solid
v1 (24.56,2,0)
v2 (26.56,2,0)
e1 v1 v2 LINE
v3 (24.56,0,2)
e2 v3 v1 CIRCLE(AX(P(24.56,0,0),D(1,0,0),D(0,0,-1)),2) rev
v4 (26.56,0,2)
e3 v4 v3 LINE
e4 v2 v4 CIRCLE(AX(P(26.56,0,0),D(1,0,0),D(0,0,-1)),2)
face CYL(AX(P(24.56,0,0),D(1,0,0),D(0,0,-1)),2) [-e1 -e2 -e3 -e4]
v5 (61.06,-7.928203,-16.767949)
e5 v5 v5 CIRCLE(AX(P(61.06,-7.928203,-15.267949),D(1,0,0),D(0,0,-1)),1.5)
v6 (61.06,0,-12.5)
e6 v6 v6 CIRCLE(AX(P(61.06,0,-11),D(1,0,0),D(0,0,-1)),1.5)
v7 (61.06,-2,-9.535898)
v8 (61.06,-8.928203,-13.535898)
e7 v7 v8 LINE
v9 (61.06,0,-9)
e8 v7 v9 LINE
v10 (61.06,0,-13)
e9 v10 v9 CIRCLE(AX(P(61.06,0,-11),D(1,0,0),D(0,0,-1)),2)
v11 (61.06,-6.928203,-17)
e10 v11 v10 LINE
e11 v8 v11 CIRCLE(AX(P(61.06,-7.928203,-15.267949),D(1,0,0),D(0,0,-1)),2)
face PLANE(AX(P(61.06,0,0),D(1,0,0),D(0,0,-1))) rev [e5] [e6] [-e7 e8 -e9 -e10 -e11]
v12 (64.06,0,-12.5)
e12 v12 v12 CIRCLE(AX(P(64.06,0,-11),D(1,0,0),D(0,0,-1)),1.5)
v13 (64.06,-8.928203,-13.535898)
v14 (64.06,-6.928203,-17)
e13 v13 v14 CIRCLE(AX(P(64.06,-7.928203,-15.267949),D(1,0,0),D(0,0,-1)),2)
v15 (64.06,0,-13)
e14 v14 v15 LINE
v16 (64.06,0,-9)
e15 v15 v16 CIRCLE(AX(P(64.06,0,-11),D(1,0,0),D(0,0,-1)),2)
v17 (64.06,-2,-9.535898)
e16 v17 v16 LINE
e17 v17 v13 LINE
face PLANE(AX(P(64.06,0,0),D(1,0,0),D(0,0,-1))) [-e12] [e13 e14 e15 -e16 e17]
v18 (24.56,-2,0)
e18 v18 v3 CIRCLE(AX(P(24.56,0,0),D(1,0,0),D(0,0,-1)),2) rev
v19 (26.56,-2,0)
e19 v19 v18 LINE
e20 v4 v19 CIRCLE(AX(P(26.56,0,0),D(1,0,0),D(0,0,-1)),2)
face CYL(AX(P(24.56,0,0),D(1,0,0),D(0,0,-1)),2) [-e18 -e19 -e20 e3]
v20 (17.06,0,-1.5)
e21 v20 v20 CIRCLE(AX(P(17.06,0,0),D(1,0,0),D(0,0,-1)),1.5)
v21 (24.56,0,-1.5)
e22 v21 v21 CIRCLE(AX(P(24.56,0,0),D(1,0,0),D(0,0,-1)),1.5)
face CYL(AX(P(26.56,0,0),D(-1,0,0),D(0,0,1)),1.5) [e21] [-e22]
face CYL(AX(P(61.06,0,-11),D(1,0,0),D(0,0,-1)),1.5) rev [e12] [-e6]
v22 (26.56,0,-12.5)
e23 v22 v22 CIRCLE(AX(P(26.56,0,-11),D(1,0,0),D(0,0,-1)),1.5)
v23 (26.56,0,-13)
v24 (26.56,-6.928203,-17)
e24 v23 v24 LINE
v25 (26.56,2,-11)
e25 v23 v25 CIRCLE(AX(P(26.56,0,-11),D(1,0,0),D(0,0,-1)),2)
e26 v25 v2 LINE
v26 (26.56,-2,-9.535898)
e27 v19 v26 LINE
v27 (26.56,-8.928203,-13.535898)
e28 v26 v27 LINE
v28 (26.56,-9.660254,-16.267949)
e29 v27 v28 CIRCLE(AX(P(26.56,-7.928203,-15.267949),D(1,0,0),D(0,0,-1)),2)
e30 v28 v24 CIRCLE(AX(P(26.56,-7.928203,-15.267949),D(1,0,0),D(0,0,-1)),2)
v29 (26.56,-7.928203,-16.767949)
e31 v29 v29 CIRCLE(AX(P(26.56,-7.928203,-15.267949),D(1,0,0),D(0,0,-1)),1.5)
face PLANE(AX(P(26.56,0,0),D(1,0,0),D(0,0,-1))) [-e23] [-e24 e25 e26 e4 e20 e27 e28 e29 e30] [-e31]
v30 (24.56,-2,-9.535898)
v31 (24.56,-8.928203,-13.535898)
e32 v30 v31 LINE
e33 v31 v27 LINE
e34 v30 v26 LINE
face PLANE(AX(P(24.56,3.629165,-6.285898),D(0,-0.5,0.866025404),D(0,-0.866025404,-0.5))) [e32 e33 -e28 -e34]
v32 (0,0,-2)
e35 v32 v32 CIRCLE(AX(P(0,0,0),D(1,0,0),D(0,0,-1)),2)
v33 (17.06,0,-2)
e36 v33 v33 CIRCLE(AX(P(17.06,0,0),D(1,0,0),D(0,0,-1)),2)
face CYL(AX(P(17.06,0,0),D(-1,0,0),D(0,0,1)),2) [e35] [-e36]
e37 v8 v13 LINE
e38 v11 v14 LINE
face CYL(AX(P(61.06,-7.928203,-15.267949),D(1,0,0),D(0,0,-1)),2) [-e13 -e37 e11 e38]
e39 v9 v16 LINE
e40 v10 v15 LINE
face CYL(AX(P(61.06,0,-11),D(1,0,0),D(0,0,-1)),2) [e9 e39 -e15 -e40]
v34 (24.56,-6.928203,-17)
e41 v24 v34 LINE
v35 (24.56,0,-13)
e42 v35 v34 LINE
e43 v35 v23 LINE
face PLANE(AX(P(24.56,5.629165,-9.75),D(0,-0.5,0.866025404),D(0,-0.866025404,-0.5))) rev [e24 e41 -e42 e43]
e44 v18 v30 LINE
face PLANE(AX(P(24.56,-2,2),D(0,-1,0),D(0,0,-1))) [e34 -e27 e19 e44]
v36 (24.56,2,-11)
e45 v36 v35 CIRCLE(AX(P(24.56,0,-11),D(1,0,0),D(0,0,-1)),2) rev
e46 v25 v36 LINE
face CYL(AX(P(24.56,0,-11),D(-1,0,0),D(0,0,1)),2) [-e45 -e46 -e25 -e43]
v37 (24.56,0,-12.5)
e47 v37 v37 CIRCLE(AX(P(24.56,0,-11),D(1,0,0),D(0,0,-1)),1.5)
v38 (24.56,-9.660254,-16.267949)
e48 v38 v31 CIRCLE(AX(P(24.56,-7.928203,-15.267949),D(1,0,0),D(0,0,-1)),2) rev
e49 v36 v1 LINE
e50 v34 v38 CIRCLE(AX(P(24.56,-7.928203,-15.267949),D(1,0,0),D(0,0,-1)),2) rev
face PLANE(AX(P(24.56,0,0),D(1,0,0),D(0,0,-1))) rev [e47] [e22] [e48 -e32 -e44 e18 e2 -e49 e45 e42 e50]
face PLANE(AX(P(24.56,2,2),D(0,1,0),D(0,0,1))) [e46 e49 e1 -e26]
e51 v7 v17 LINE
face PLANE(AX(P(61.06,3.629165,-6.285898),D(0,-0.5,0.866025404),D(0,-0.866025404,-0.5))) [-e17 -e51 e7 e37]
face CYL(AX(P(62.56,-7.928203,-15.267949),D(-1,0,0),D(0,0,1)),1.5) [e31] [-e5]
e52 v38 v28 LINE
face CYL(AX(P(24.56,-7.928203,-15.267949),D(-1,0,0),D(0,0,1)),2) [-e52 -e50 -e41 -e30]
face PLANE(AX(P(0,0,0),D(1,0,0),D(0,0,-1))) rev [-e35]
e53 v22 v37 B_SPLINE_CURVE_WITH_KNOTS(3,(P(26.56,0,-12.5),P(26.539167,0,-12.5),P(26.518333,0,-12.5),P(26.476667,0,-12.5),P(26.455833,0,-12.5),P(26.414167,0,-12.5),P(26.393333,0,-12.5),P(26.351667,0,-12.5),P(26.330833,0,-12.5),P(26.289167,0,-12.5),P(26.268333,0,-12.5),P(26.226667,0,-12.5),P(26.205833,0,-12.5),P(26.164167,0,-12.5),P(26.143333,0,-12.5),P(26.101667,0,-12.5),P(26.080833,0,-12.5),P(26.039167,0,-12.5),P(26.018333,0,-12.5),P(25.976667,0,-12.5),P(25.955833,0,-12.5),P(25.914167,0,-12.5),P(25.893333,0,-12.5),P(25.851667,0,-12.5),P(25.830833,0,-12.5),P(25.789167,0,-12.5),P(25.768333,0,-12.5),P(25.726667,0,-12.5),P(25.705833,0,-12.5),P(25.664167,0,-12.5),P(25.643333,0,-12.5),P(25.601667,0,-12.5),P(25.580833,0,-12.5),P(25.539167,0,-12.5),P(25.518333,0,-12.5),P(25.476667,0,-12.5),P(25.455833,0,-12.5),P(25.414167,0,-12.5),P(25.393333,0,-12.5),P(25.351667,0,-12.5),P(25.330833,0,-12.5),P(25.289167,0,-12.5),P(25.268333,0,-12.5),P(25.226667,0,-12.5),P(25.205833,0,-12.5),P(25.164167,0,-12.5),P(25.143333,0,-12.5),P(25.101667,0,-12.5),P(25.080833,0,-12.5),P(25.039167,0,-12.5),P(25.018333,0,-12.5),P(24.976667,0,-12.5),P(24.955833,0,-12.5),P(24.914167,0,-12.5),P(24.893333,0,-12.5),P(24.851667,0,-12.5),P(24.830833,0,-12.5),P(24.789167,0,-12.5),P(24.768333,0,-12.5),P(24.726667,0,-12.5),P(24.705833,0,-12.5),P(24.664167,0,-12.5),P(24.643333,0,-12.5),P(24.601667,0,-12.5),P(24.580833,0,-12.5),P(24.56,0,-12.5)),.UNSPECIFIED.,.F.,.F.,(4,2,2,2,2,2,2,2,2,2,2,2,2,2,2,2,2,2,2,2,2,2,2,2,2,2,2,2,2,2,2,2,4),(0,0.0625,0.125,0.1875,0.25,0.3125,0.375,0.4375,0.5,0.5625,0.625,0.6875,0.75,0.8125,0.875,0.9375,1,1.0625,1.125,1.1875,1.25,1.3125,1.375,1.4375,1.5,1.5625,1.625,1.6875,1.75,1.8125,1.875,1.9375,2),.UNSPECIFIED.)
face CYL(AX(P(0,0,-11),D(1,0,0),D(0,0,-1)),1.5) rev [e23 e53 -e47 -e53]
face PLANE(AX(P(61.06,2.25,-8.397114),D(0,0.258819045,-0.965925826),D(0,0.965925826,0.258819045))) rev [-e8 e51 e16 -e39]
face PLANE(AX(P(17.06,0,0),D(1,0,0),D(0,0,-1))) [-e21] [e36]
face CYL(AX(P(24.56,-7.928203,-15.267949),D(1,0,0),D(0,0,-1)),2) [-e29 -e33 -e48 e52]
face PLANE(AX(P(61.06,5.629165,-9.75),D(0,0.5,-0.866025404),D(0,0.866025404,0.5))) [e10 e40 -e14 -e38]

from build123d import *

# Parameters (mm, degrees)
SKETCH2_R                = 2
BOSS_EXTRUDE1_DEPTH      = 17.06
SKETCH3_R                = 1.5
BOSS_EXTRUDE2_DEPTH      = 9.5
SKETCH4_W                = 3.988125856
SKETCH4_H                = 4
BOSS_EXTRUDE3_DEPTH      = 2
SKETCH5_W                = 2
SKETCH5_H                = 4
BOSS_EXTRUDE4_DEPTH      = 15
FILLET1_R                = 2
FILLET2_R                = 2
FILLET3_R                = 2
SKETCH6_R                = 1.5
CUT_EXTRUDE1_DEPTH       = 30.638380523
BOSS_EXTRUDE5_DEPTH      = 2
FILLET4_R                = 2
FILLET5_R                = 2
SKETCH8_R                = 1.5
BOSS_EXTRUDE6_DEPTH      = 36
BOSS_EXTRUDE7_DEPTH      = 1.5
BOSS_EXTRUDE7_DEPTH_BACK = 1.5
SKETCH9_R                = 2
SKETCH9_R_2              = 1.5


with BuildPart() as part:
    # Sketch2 → Boss-Extrude1 (new body)
    with BuildSketch(Plane(origin=(0, 0, 0), x_dir=(0, 0, -1), z_dir=(1, 0, 0))):
        Circle(SKETCH2_R)
    extrude(amount=BOSS_EXTRUDE1_DEPTH)

    # Sketch3 → Boss-Extrude2 (add)
    with BuildSketch(Plane(origin=(17.06, 0, 0), x_dir=(0, 0, -1), z_dir=(1, 0, 0))):
        Circle(SKETCH3_R)
    extrude(amount=BOSS_EXTRUDE2_DEPTH)

    # Sketch4 → Boss-Extrude3 (add)
    with BuildSketch(Plane(origin=(26.56, 0, 0), x_dir=(0, 0, -1), z_dir=(1, 0, 0))):
        with Locations((-0.005937072, 0)):
            Rectangle(SKETCH4_W, SKETCH4_H)
    extrude(amount=-BOSS_EXTRUDE3_DEPTH)

    # Sketch5 → Boss-Extrude4 (add)
    with BuildSketch(Plane.XY.offset(2)):
        with Locations((25.56, 0)):
            Rectangle(SKETCH5_W, SKETCH5_H)
    extrude(amount=-BOSS_EXTRUDE4_DEPTH)

    # Fillet1
    fillet1_edges = [part.edges().sort_by_distance(p)[0] for p in [
        (25.56, 2, 2),
    ]]
    fillet(fillet1_edges, radius=FILLET1_R)

    # Fillet2
    fillet2_edges = [part.edges().sort_by_distance(p)[0] for p in [
        (25.56, -2, 2),
    ]]
    fillet(fillet2_edges, radius=FILLET2_R - 0.0001)  # a hair under: the kernel refuses the full size

    # Fillet3
    fillet3_edges = [part.edges().sort_by_distance(p)[0] for p in [
        (25.56, -2, -13),
        (25.56, 2, -13),
    ]]
    fillet(fillet3_edges, radius=FILLET3_R - 0.0001)  # a hair under: the kernel refuses the full size

    # Sketch6 → Cut-Extrude1 (cut, through all)
    with BuildSketch(Plane(origin=(26.56, 0, 0), x_dir=(0, 0, -1), z_dir=(1, 0, 0))):
        with Locations((11, 0)):
            Circle(SKETCH6_R)
    extrude(amount=-CUT_EXTRUDE1_DEPTH, mode=Mode.SUBTRACT)

    # Sketch7 → Boss-Extrude5 (add)
    with BuildSketch(Plane(origin=(26.56, 0, 0), x_dir=(0, 0, -1), z_dir=(1, 0, 0))):
        with BuildLine():
            Line((18, -8.660254038), (13, 0))
            ThreePointArc((13, 0), (12.414213562, -1.414213562), (11, -2))
            Line((11, -2), (9.535898385, -2))
            Line((9.535898385, -2), (14.535898385, -10.660254038))
            Line((14.535898385, -10.660254038), (18, -8.660254038))
        make_face()
    extrude(amount=-BOSS_EXTRUDE5_DEPTH)

    # Fillet4
    fillet4_edges = [part.edges().sort_by_distance(p)[0] for p in [
        (25.56, -8.660254038, -18),
    ]]
    fillet(fillet4_edges, radius=FILLET4_R)

    # Fillet5
    fillet5_edges = [part.edges().sort_by_distance(p)[0] for p in [
        (25.56, -10.660254038, -14.535898385),
    ]]
    fillet(fillet5_edges, radius=FILLET5_R - 0.0001)  # a hair under: the kernel refuses the full size

    # Sketch8 → Boss-Extrude6 (add)
    with BuildSketch(Plane(origin=(26.56, 0, 0), x_dir=(0, 0, -1), z_dir=(1, 0, 0))):
        with Locations((15.267949192, -7.92820323)):
            Circle(SKETCH8_R)
    extrude(amount=BOSS_EXTRUDE6_DEPTH)

    # Sketch9 → Boss-Extrude7 (add, two sides: drawn at the far end of the back side and taken through both)
    # profile 1 of 4: a face of its own
    with BuildSketch(Plane(origin=(62.56, 0, 0), x_dir=(0, 0, -1), z_dir=(1, 0, 0)).offset(-BOSS_EXTRUDE7_DEPTH_BACK)):
        with Locations((15.267949192, -7.92820323)):
            Circle(SKETCH9_R)
        with Locations((15.267949192, -7.92820323)):
            Circle(SKETCH9_R_2, mode=Mode.SUBTRACT)
    # profile 2 of 4: a face of its own
    with BuildSketch(Plane(origin=(62.56, 0, 0), x_dir=(0, 0, -1), z_dir=(1, 0, 0)).offset(-BOSS_EXTRUDE7_DEPTH_BACK)):
        with BuildLine():
            ThreePointArc((13.535898385, -8.92820323), (14.267949192, -6.196152423), (17, -6.92820323))
            Line((17, -6.92820323), (13, 0))
            ThreePointArc((13, 0), (11.51763809, -1.931851653), (9.267949192, -1))
            Line((9.267949192, -1), (9.535898385, -2))
            Line((9.535898385, -2), (13.535898385, -8.92820323))
        make_face()
    # profile 3 of 4: a face of its own
    with BuildSketch(Plane(origin=(62.56, 0, 0), x_dir=(0, 0, -1), z_dir=(1, 0, 0)).offset(-BOSS_EXTRUDE7_DEPTH_BACK)):
        with BuildLine():
            ThreePointArc((9.267949192, -1), (11.51763809, -1.931851653), (13, 0))
            ThreePointArc((13, 0), (11, 2), (9, 0))
            Line((9, 0), (9.267949192, -1))
        make_face()
        with Locations((11, 0)):
            Circle(SKETCH9_R_2, mode=Mode.SUBTRACT)
    # profile 4 of 4: a face of its own
    with BuildSketch(Plane(origin=(62.56, 0, 0), x_dir=(0, 0, -1), z_dir=(1, 0, 0)).offset(-BOSS_EXTRUDE7_DEPTH_BACK)):
        with Locations((15.267949192, -7.92820323)):
            Circle(SKETCH9_R_2)
    extrude(amount=BOSS_EXTRUDE7_DEPTH + BOSS_EXTRUDE7_DEPTH_BACK)


solid = part.part
